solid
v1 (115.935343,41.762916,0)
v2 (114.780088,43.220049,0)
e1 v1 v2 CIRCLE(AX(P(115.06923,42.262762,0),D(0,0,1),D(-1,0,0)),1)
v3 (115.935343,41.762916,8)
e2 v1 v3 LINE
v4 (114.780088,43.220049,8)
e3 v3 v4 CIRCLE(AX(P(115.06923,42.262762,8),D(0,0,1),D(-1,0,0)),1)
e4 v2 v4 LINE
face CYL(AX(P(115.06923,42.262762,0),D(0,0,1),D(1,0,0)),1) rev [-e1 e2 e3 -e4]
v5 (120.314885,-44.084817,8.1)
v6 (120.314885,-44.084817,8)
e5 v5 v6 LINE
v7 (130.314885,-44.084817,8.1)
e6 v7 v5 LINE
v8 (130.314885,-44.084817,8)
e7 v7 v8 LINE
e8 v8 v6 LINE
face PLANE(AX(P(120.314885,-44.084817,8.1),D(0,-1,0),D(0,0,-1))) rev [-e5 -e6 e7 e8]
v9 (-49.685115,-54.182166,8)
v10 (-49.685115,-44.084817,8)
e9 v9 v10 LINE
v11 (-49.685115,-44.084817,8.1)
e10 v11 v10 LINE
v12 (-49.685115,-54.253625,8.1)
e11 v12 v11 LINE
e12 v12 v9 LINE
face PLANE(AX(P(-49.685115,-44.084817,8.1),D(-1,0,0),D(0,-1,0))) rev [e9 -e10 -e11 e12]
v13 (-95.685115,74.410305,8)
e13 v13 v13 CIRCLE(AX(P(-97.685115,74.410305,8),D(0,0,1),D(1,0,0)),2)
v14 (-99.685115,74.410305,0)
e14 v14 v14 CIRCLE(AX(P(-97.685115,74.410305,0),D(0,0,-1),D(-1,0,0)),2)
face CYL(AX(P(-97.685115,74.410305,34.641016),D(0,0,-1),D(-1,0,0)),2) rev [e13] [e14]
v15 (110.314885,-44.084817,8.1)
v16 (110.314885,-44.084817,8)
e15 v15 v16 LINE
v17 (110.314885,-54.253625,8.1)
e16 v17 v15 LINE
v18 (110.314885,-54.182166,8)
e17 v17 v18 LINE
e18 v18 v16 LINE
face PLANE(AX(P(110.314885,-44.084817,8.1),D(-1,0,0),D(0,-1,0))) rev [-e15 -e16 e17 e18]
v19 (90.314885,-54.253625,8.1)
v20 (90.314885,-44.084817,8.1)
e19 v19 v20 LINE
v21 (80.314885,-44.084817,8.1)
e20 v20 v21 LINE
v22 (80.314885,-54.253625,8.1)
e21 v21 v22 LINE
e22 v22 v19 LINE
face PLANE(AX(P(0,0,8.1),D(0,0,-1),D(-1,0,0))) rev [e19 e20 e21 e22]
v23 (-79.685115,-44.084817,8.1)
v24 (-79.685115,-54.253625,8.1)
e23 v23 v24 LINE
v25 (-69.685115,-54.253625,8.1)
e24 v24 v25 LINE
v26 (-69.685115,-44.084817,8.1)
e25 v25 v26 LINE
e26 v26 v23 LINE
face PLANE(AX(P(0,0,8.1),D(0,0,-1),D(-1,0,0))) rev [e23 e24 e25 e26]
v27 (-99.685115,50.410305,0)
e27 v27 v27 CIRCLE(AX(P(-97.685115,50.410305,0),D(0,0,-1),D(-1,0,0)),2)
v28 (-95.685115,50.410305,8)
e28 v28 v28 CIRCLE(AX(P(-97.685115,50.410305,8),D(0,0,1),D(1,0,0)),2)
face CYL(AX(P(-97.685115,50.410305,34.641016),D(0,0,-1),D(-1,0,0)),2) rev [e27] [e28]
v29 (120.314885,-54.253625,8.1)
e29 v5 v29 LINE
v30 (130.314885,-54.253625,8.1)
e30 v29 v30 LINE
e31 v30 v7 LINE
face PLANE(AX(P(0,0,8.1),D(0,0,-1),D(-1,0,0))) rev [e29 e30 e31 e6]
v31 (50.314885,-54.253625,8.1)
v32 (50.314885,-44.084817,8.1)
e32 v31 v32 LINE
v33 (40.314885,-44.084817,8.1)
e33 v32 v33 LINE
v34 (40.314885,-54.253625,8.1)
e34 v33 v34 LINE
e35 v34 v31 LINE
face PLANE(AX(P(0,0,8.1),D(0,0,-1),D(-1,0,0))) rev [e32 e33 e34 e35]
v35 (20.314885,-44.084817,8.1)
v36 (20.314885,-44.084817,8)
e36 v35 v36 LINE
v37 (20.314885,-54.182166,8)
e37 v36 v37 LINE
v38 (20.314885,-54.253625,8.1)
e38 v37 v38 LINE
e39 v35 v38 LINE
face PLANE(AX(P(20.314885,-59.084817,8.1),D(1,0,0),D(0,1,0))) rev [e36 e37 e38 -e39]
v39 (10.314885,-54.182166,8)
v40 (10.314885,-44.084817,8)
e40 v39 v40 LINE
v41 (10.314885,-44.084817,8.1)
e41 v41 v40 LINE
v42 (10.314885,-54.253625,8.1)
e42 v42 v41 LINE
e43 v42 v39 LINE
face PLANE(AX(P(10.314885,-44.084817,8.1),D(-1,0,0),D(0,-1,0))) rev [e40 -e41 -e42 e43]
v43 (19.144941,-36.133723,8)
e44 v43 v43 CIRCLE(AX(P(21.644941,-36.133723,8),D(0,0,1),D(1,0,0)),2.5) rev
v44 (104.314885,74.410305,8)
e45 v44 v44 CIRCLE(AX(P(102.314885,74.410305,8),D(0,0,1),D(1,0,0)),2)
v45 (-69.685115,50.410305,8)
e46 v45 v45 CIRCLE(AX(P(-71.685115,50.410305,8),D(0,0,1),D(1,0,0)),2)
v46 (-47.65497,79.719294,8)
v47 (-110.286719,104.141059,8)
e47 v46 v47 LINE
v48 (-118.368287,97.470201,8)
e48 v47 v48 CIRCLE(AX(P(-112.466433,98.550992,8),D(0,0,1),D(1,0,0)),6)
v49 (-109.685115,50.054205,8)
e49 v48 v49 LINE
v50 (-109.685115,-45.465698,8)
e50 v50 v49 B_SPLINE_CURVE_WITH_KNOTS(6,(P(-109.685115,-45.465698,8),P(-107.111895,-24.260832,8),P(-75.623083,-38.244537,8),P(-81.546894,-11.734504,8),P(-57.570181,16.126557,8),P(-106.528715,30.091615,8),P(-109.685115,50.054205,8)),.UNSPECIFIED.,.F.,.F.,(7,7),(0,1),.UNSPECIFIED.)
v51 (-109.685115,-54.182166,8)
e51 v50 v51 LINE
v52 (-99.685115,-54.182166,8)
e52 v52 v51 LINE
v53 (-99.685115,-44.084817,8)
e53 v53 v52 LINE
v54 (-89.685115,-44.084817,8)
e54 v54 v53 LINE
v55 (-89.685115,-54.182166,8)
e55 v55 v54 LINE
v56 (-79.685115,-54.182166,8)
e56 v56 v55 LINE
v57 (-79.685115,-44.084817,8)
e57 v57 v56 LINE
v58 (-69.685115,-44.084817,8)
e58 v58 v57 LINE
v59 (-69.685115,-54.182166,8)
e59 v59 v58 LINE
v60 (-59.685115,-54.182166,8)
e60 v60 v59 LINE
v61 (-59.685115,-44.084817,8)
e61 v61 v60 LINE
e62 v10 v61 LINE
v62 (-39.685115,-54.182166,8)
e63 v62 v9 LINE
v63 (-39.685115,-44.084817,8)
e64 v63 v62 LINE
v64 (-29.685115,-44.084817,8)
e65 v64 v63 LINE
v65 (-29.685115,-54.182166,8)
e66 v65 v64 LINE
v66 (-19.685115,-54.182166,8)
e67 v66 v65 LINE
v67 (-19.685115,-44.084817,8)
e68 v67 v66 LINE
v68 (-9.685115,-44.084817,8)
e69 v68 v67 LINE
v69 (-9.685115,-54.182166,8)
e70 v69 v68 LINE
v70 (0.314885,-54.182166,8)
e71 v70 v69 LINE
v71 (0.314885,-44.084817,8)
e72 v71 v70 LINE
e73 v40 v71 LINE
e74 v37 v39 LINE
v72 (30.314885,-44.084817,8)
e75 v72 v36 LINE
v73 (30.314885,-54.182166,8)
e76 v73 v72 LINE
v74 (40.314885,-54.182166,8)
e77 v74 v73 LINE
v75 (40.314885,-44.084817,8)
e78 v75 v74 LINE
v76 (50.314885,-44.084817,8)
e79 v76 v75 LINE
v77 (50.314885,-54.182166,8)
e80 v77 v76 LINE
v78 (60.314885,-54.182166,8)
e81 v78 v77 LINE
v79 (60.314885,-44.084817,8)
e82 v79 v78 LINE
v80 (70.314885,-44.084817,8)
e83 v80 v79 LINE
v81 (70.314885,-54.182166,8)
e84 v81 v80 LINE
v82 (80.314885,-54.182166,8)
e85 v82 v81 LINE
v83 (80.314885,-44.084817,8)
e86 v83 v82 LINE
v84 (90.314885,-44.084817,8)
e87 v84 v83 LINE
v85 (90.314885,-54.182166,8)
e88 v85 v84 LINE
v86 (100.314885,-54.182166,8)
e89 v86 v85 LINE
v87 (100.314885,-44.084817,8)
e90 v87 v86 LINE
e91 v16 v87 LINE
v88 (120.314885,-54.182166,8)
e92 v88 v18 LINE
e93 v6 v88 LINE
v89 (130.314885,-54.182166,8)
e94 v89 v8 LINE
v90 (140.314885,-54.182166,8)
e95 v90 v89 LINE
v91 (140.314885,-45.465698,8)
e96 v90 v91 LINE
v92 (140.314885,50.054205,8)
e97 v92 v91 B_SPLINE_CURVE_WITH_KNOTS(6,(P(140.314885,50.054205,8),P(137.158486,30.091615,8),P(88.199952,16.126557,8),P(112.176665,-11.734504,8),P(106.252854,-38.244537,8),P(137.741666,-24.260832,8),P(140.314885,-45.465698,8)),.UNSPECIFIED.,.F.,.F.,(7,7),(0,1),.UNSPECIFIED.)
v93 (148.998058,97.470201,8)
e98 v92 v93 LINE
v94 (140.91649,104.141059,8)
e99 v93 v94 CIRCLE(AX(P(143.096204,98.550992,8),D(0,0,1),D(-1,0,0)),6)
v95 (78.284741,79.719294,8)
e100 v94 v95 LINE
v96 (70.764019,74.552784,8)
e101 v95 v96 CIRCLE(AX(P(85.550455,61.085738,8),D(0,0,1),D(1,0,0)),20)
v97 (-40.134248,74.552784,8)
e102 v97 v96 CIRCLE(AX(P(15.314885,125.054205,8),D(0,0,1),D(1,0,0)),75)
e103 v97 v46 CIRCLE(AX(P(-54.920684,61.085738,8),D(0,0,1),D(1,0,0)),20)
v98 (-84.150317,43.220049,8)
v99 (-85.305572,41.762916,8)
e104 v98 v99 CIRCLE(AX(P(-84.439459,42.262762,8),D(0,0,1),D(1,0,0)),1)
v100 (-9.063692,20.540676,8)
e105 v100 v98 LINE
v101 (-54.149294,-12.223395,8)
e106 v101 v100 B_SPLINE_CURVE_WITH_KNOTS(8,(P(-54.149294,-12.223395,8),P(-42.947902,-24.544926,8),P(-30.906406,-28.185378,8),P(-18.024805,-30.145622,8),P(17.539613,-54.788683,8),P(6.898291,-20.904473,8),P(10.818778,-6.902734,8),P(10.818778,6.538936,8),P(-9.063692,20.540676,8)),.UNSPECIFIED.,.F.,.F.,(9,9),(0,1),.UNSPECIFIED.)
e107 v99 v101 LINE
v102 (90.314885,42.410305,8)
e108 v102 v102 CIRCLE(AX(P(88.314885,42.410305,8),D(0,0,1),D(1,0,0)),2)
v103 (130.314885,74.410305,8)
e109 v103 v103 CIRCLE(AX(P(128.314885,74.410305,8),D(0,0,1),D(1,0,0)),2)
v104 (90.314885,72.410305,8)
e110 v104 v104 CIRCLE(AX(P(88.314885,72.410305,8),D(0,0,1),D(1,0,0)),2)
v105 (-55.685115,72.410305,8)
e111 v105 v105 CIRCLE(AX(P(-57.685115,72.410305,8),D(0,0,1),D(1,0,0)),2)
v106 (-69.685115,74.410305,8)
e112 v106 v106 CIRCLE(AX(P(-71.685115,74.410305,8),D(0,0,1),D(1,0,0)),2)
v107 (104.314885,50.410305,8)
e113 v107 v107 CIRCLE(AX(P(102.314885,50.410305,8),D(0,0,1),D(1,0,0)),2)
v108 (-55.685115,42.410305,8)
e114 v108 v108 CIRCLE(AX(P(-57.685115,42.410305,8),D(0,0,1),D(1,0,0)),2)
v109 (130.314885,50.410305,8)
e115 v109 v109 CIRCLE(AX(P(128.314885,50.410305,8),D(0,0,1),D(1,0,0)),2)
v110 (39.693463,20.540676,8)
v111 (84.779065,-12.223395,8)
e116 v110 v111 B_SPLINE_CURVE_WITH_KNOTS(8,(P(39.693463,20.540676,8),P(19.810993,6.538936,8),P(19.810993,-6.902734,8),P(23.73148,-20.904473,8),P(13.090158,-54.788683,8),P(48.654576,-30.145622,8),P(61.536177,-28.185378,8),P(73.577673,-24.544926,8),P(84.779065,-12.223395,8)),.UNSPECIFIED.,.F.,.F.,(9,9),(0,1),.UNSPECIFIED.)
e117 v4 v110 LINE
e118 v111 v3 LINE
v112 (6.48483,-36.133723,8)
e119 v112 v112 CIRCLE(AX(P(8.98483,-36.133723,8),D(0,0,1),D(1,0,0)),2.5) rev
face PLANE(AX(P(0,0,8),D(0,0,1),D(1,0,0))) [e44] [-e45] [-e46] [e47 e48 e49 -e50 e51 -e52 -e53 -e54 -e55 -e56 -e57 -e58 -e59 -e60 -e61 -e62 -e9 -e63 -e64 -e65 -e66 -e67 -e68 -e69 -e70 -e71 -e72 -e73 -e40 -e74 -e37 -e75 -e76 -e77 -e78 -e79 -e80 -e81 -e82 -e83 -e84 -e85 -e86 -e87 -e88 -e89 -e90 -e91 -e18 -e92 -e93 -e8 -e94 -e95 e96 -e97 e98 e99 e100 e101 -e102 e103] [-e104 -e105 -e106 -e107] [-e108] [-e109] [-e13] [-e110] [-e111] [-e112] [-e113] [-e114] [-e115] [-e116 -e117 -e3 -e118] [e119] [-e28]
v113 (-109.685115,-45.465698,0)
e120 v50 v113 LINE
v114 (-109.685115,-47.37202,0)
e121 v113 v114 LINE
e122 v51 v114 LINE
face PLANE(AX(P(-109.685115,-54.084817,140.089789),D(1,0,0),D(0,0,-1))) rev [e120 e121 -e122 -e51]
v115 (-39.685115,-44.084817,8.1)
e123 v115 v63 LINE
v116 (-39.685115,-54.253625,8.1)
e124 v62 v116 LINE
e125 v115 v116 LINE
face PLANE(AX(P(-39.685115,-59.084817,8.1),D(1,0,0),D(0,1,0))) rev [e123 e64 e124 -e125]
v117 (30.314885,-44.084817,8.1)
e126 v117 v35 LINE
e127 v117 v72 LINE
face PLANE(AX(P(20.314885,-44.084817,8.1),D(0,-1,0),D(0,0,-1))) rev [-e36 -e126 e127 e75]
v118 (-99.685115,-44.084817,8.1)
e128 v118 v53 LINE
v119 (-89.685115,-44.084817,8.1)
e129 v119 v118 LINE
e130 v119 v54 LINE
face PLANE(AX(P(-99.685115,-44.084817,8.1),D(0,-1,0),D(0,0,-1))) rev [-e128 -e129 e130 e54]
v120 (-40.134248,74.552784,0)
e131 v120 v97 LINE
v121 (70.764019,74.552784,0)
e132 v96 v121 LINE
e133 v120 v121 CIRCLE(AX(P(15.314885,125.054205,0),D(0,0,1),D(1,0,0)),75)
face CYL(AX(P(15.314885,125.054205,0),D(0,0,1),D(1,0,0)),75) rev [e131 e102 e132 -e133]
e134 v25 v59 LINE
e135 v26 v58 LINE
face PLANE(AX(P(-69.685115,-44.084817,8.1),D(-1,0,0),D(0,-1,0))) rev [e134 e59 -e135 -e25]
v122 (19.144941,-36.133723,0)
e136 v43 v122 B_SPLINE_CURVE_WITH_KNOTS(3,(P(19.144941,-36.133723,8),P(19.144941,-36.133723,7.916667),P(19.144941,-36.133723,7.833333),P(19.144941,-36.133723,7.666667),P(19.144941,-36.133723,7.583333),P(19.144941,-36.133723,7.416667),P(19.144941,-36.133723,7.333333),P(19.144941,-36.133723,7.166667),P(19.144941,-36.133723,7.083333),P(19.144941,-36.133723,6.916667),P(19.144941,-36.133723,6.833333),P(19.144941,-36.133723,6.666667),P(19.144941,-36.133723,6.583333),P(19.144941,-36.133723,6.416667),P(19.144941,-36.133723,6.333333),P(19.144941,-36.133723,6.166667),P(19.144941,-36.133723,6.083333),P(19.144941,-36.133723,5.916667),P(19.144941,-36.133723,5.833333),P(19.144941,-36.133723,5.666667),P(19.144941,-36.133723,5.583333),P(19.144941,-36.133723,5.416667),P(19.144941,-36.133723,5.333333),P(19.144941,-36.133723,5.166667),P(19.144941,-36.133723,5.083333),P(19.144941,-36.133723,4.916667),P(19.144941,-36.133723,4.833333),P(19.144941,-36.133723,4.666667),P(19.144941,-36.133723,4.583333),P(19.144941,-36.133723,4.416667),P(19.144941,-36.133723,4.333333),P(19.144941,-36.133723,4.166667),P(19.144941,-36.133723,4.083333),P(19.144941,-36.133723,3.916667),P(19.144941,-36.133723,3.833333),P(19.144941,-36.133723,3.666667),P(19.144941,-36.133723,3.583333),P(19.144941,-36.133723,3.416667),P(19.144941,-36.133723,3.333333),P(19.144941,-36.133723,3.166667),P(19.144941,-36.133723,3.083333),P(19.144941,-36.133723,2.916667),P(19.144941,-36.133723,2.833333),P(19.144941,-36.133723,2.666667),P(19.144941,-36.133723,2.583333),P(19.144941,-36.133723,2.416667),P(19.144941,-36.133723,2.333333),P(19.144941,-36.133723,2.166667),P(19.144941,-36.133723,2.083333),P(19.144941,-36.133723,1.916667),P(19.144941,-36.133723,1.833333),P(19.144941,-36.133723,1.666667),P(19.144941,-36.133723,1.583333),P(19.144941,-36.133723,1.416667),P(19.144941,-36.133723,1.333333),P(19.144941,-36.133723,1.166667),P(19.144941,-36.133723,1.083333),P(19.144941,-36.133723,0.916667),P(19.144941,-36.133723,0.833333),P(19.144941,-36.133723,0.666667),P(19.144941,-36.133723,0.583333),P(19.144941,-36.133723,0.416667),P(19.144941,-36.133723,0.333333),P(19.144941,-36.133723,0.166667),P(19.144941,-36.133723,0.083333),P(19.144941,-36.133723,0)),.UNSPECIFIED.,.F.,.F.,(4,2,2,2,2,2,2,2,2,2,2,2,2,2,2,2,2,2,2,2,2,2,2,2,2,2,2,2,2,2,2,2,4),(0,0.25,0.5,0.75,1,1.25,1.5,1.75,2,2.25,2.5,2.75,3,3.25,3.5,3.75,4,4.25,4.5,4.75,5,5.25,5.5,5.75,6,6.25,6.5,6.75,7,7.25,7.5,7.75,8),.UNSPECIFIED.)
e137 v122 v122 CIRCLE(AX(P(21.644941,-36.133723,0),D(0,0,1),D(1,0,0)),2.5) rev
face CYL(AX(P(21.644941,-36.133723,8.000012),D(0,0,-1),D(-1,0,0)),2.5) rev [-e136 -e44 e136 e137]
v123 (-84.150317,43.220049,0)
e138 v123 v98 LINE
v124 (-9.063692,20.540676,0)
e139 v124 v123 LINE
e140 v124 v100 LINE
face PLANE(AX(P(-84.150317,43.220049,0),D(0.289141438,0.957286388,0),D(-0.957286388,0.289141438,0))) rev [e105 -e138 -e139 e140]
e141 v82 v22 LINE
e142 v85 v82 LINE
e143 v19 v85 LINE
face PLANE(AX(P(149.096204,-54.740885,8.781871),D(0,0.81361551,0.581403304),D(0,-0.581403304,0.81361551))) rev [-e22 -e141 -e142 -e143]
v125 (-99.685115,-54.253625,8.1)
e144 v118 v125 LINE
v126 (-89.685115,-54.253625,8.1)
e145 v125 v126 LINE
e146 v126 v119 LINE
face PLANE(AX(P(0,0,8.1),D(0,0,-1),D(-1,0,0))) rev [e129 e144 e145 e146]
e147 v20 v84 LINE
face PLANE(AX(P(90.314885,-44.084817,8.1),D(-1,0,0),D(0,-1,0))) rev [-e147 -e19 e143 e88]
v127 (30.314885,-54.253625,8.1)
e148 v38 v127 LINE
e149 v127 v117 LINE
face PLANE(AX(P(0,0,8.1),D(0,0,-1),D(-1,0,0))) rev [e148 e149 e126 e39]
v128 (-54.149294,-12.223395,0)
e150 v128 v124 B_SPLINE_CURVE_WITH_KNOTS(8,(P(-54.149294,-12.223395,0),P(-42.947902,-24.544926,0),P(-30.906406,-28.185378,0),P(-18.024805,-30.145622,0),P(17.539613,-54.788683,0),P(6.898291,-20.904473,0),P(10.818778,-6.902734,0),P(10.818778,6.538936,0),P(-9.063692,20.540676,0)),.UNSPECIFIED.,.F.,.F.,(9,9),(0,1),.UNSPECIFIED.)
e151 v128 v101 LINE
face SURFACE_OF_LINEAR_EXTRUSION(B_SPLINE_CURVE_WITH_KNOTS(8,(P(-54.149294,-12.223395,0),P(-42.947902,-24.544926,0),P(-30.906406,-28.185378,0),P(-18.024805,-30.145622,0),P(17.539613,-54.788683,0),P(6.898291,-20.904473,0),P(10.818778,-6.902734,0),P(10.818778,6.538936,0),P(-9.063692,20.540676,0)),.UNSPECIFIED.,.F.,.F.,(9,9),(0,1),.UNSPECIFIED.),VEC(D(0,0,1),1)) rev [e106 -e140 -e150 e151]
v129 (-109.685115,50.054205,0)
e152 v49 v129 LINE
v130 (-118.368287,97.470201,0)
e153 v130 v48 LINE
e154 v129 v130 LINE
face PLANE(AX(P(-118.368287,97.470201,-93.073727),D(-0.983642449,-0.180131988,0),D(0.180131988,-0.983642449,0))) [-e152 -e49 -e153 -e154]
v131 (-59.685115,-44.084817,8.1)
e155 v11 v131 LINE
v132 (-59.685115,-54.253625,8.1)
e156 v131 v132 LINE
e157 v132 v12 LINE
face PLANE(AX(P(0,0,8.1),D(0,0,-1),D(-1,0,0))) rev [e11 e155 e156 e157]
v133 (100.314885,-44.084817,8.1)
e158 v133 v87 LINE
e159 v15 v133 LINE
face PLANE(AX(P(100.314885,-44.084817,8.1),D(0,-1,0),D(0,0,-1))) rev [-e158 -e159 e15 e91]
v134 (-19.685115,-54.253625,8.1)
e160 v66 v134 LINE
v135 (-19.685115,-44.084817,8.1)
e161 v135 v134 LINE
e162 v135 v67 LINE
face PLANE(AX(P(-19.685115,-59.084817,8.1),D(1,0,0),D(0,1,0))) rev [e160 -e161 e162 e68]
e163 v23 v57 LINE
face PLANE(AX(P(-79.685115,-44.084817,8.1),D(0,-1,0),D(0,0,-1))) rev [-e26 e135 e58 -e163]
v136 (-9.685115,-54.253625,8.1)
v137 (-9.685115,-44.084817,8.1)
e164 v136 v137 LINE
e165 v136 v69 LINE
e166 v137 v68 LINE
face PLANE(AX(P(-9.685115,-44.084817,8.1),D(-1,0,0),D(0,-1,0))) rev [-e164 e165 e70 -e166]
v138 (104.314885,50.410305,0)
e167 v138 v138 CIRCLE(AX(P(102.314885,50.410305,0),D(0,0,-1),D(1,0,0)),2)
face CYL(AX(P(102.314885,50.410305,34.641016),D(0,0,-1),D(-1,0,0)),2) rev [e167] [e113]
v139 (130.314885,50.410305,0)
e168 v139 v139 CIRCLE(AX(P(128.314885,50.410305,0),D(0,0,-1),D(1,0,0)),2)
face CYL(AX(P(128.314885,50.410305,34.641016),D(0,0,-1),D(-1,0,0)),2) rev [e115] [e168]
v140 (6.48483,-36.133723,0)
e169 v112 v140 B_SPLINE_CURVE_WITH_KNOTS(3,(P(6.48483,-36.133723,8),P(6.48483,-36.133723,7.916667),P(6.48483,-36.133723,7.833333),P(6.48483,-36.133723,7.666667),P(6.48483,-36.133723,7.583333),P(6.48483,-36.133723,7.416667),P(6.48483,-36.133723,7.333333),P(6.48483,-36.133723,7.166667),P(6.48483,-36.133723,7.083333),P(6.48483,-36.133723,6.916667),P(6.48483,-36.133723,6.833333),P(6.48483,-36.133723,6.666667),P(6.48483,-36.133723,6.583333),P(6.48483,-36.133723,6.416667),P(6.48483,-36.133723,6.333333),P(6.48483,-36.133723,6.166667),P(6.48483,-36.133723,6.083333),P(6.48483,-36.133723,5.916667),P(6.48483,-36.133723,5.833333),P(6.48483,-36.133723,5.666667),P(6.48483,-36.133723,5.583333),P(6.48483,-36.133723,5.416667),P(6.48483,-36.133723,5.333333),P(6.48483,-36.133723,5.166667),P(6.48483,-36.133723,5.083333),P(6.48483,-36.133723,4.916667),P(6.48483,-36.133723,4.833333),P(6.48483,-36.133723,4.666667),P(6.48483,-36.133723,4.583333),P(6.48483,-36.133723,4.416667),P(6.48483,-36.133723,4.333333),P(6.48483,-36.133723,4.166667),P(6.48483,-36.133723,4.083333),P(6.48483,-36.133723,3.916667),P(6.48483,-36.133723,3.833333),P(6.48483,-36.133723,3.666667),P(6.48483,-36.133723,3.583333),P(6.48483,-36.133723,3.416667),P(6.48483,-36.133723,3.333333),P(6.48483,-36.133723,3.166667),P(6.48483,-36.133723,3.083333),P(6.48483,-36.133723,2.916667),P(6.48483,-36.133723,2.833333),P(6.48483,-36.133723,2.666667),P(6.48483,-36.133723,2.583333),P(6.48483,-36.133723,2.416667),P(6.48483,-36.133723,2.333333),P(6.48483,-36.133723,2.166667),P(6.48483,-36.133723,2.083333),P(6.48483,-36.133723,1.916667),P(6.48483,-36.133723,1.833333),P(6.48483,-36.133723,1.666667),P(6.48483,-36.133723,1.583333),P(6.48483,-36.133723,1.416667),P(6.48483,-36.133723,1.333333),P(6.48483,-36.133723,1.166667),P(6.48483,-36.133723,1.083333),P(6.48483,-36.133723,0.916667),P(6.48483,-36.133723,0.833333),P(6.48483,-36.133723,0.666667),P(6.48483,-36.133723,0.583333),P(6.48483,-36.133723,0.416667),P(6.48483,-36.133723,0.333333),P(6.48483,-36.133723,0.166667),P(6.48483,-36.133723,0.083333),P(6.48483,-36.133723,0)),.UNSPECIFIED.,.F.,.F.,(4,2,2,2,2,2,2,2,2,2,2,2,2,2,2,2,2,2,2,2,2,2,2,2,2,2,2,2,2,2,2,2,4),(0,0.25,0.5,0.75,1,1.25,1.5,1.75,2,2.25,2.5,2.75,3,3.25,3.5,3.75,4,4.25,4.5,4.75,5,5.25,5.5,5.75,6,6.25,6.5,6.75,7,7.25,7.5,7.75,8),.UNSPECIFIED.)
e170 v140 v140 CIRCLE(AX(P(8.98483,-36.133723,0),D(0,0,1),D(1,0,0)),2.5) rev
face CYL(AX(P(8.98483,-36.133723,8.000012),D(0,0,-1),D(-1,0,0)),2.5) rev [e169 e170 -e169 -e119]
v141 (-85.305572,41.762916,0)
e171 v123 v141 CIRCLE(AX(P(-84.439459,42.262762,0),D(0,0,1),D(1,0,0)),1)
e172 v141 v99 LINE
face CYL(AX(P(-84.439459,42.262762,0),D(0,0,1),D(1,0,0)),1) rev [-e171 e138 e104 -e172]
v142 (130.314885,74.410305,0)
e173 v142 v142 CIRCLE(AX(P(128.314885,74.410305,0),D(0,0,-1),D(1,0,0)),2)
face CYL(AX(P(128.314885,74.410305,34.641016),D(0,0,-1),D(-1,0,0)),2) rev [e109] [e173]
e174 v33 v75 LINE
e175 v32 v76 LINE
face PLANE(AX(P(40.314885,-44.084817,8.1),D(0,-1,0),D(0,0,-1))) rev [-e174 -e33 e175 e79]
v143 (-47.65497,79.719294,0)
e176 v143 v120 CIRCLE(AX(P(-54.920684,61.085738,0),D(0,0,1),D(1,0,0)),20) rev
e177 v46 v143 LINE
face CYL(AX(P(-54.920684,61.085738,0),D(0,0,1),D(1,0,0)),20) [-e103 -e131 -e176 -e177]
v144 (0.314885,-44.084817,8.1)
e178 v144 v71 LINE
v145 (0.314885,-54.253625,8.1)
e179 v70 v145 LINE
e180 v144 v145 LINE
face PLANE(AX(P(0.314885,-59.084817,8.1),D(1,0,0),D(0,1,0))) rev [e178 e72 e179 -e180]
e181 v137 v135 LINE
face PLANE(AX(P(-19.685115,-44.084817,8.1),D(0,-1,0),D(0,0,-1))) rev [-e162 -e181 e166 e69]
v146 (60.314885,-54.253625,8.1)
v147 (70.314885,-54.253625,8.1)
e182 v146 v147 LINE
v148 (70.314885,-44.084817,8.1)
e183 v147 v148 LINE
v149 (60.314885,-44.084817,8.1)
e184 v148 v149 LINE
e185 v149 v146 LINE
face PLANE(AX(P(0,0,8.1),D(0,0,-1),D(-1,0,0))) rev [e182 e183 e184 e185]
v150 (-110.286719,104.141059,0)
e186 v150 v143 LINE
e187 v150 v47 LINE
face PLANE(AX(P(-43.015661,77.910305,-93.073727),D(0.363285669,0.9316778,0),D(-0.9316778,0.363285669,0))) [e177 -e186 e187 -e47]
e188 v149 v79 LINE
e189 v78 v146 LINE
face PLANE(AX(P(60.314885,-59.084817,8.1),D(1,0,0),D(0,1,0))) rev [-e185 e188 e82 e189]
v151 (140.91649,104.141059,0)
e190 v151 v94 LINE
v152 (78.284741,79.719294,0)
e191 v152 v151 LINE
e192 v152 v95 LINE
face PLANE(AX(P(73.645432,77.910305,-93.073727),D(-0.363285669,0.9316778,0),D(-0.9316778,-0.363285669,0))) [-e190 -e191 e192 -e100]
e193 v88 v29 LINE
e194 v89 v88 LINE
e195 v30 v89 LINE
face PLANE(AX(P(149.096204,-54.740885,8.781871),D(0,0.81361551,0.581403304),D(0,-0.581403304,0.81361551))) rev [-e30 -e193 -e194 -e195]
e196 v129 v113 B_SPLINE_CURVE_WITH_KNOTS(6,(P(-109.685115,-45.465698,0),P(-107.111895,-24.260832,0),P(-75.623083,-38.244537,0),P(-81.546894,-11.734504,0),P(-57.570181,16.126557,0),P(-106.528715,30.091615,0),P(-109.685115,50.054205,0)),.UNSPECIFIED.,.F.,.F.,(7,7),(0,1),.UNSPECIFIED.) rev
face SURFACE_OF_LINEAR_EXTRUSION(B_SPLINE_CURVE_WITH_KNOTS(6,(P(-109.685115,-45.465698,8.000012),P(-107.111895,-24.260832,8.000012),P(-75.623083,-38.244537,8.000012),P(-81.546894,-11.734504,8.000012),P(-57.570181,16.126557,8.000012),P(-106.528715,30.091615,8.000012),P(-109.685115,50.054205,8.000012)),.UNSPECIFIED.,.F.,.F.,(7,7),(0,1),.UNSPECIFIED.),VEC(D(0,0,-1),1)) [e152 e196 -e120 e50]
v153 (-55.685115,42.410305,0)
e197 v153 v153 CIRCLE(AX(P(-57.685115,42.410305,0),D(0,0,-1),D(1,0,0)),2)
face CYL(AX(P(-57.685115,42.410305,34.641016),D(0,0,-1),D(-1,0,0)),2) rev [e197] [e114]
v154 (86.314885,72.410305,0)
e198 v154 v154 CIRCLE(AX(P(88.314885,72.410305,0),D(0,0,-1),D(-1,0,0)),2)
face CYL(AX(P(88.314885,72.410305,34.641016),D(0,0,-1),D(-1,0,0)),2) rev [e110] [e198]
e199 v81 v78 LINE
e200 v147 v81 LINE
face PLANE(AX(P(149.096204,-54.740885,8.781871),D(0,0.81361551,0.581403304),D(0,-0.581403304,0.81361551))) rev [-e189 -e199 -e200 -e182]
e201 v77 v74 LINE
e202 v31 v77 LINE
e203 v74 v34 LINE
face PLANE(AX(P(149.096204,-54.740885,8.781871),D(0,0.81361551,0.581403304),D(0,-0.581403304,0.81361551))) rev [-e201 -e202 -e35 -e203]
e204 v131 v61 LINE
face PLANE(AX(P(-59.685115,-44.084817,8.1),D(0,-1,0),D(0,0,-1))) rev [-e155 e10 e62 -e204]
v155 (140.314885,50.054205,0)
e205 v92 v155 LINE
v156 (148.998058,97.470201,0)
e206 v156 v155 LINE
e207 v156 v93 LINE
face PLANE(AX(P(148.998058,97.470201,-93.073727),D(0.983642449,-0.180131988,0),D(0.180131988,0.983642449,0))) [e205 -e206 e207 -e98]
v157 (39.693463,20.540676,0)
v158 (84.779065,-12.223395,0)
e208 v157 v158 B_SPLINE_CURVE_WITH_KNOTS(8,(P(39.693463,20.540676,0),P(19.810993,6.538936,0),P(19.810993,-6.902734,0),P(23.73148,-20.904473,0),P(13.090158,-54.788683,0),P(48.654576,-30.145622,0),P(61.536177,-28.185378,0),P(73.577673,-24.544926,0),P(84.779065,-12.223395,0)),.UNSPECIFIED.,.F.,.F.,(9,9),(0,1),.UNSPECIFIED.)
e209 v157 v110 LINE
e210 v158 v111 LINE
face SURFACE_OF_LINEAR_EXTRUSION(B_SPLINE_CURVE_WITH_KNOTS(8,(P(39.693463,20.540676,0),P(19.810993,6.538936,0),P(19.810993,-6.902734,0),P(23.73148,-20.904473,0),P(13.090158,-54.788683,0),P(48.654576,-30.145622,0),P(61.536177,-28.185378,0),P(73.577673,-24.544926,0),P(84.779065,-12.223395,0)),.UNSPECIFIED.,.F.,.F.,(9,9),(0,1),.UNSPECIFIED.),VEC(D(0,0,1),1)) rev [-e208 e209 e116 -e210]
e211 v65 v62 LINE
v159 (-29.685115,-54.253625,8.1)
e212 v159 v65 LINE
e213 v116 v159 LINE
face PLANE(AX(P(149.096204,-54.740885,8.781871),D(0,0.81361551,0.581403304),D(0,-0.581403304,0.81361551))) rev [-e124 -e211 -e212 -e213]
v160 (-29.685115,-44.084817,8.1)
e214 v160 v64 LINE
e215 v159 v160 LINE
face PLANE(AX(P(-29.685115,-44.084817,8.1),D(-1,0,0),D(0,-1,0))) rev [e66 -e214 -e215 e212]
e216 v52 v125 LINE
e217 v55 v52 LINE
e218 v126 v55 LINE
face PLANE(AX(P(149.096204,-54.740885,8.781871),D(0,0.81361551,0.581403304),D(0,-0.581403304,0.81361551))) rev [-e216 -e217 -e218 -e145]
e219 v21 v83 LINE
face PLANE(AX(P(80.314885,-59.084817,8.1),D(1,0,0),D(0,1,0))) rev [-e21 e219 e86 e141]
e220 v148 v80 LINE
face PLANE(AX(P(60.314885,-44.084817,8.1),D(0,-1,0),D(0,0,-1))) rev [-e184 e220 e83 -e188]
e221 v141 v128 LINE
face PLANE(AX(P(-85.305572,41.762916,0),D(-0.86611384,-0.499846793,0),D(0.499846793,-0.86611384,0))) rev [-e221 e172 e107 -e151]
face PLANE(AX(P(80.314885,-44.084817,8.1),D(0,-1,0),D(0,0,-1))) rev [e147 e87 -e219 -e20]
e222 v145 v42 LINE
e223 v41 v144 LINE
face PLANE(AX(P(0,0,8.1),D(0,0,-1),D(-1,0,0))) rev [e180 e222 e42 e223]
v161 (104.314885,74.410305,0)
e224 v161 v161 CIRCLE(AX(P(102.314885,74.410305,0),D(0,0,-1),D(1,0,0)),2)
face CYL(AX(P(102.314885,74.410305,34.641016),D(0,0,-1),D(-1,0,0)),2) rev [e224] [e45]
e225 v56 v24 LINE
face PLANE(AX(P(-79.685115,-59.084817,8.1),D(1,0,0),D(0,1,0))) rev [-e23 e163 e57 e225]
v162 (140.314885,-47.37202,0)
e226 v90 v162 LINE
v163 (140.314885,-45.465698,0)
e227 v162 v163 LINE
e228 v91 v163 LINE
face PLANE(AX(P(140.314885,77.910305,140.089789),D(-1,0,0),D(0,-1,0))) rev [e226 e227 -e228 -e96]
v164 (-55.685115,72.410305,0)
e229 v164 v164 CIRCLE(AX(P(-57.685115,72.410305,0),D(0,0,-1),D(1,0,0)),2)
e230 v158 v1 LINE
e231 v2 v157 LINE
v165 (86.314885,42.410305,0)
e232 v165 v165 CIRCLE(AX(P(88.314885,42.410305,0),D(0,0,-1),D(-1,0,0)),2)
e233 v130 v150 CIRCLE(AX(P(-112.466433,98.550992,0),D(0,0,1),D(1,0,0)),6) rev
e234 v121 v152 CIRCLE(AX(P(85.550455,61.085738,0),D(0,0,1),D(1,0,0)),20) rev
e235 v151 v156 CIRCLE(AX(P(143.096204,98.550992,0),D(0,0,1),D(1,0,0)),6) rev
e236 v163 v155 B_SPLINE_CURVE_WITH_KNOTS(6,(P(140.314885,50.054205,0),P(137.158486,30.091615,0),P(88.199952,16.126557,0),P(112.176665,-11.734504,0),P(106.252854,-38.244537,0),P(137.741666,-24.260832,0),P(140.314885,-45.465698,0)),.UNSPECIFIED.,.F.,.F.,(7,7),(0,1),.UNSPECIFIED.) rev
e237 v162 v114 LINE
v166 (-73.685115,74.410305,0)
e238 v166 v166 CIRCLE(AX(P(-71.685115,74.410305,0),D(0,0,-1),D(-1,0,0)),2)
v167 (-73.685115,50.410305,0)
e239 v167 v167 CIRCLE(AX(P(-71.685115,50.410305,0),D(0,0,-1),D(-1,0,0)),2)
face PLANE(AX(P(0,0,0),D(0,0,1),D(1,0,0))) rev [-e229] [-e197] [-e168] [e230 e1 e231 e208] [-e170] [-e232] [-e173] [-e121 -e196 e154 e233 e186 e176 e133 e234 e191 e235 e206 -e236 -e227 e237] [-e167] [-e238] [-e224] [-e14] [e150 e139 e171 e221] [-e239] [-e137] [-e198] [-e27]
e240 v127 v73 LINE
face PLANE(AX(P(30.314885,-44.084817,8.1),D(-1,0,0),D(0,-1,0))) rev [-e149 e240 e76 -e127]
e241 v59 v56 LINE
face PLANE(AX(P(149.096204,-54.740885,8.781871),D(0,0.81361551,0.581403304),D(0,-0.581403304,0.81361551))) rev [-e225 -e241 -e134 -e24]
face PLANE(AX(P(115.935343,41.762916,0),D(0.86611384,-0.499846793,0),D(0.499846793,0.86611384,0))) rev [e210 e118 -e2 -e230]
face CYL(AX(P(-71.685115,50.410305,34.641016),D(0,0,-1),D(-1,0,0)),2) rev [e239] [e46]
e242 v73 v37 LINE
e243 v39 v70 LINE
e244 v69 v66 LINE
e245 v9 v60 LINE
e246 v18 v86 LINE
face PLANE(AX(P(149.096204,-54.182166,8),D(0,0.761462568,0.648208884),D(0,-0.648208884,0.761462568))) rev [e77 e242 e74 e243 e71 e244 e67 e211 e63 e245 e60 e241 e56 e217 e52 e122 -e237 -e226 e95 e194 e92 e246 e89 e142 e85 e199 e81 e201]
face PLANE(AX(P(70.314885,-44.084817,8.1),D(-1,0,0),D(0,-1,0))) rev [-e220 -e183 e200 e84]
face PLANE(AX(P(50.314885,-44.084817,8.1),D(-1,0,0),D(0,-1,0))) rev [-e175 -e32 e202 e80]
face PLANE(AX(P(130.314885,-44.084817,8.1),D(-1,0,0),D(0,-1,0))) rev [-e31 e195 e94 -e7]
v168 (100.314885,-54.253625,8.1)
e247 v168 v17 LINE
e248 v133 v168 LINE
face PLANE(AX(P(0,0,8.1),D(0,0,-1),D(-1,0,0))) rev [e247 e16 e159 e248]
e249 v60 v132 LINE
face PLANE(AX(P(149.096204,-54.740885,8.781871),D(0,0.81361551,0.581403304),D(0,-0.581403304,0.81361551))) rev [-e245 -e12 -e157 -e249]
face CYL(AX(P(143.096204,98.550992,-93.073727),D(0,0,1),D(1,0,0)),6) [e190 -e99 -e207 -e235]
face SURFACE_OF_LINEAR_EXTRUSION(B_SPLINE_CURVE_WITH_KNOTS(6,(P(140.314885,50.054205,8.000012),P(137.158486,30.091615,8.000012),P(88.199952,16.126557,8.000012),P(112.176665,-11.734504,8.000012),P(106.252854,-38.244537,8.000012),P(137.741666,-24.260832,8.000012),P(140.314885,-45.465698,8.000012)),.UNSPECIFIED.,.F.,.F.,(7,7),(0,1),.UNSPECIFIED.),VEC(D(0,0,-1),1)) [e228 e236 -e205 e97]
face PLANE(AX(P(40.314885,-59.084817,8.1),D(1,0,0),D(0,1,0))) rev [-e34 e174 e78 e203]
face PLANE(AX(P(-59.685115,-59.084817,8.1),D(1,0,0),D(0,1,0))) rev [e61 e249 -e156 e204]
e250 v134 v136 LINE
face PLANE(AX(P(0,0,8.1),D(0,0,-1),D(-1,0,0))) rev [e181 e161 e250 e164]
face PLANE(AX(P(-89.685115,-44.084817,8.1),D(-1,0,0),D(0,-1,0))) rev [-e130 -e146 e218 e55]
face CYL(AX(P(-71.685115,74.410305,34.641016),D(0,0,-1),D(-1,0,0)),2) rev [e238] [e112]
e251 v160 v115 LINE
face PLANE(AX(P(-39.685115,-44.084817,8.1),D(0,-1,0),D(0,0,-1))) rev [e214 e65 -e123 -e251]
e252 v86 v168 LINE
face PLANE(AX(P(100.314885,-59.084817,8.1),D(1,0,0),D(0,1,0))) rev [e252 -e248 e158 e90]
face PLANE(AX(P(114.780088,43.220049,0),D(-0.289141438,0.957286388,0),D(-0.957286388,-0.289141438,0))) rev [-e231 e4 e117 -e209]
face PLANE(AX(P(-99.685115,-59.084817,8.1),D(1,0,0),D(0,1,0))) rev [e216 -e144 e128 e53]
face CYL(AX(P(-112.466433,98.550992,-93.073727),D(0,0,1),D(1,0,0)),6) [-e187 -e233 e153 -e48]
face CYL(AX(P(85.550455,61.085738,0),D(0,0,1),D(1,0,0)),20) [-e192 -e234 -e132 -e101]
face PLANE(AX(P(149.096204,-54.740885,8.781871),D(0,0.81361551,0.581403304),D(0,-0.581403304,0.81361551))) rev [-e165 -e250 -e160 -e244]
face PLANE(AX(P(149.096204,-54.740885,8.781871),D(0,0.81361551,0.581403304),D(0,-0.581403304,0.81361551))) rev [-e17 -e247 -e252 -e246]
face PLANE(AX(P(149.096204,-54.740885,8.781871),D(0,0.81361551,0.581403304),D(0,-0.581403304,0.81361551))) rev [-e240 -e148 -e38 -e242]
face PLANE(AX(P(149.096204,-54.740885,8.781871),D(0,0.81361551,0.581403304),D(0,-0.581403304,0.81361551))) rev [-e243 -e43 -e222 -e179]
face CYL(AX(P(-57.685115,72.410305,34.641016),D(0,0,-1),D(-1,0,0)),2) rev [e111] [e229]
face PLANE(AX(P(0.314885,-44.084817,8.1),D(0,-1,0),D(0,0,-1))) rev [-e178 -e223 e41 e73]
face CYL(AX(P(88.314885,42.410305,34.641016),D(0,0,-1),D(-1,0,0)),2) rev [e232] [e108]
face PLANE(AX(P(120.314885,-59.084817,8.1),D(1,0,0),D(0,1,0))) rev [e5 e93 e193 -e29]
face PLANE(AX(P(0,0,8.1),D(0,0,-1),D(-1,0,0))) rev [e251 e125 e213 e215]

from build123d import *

# Parameters (mm, degrees)
SKETCH_1_W               = 240
SKETCH_1_H               = 120
EXTRUDE_1_DEPTH          = 8
CUT_EXTRUDE_3_DEPTH      = 240
EXTRUDE_3_DEPTH          = 240
EXTRUDE_4_DEPTH          = 2
EXTRUDE_5_DEPTH          = 2
SKETCH_10_R              = 2
CUT_EXTRUDE_4_DEPTH      = 160.937906437
CUT_EXTRUDE_START        = -8
CUT_EXTRUDE_5_DEPTH      = 8
CUT_EXTRUDE_6_DEPTH      = 253.812214384
CUT_EXTRUDE_6_DEPTH_BACK = 253.812214384
CUT_EXTRUDE_7_DEPTH      = 255.695928005
EXTRUDE_6_DEPTH          = 240
CUT_EXTRUDE_8_REACH      = 254.456
SKETCH_19_W              = 5
SKETCH_19_H              = 131.995122826
EXTRUDE_7_DEPTH          = 8
CUT_EXTRUDE_9_DEPTH      = 25000
CUT_EXTRUDE_10_OUTLINE_R = 2.5
CUT_EXTRUDE_10_DEPTH     = 8
EXTRUDE_9_DEPTH          = 8
FILLET_1_R               = 20
EXTRUDE_11_DEPTH         = 250
SKETCH_26_W              = 10
SKETCH_26_H              = 15
EXTRUDE_12_DEPTH         = 0.1
CUT_EXTRUDE_11_DEPTH     = 280.220863782


# Read off the part's stored shape, not the designer's step: 切除-拉伸5, 切除-拉伸10
with BuildPart() as part:
    # 草图1 → 凸台-拉伸1 (new body)
    with BuildSketch(Plane.XY):
        with Locations((15.314885496, 17.910305344)):
            Rectangle(SKETCH_1_W, SKETCH_1_H)
    extrude(amount=EXTRUDE_1_DEPTH)

    # 草图5 → 切除-拉伸3 (cut)
    with BuildSketch(Plane.ZY.offset(104.685114504)):
        Polygon((0, -42.089694656), (8, -42.089694656), (1.137058799, -38.127373707), (0, -37.470892503), align=None)
    extrude(amount=-CUT_EXTRUDE_3_DEPTH, mode=Mode.SUBTRACT)

    # 草图6 → 凸台-拉伸3 (add)
    with BuildSketch(Plane.ZY.offset(104.685114504)):
        Polygon((8, -42.089694656), (34.641016151, -59.78029358), (8, -36.526716392), align=None)
    extrude(amount=-EXTRUDE_3_DEPTH)

    # 草图7 → 凸台-拉伸4 (add)
    with BuildSketch(Plane.ZY.offset(104.685114504)):
        Polygon((8, 10.562283697), (24.445035201, -50.880744528), (8, -36.526716392), align=None)
    extrude(amount=-EXTRUDE_4_DEPTH)

    # 草图8 → 凸台-拉伸5 (add)
    with BuildSketch(Plane(origin=(135.314885496, 0, 0), x_dir=(0, 0, -1), z_dir=(1, 0, 0))):
        Polygon((-8, 10.562283697), (-8, -36.526716392), (-24.445035201, -50.880744528), align=None)
    extrude(amount=-EXTRUDE_5_DEPTH)

    # 草图10 → 切除-拉伸4 (cut, through all)
    with BuildSketch(Plane(origin=(0, 0, 0), x_dir=(-1, 0, 0), z_dir=(0, 0, -1))):
        with Locations((-88.314885496, 72.410305344)):
            Circle(SKETCH_10_R)
        with Locations((-88.314885496, 42.410305344)):
            Circle(SKETCH_10_R)
        with Locations(Location((57.685114504, 42.410305344, 0), (0, 0, 180))):
            Circle(SKETCH_10_R)
        with Locations(Location((57.685114504, 72.410305344, 0), (0, 0, 180))):
            Circle(SKETCH_10_R)
        with Locations((97.685114504, 74.410305344)):
            Circle(SKETCH_10_R)
        with Locations((97.685114504, 50.410305344)):
            Circle(SKETCH_10_R)
        with Locations((71.685114504, 74.410305344)):
            Circle(SKETCH_10_R)
        with Locations((71.685114504, 50.410305344)):
            Circle(SKETCH_10_R)
        with Locations(Location((-102.314885496, 50.410305344, 0), (0, 0, 180))):
            Circle(SKETCH_10_R)
        with Locations(Location((-128.314885496, 50.410305344, 0), (0, 0, 180))):
            Circle(SKETCH_10_R)
        with Locations(Location((-128.314885496, 74.410305344, 0), (0, 0, 180))):
            Circle(SKETCH_10_R)
        with Locations(Location((-102.314885496, 74.410305344, 0), (0, 0, 180))):
            Circle(SKETCH_10_R)
    extrude(amount=-CUT_EXTRUDE_4_DEPTH, mode=Mode.SUBTRACT)

    # 切除-拉伸5 outline → 切除-拉伸5 (cut)
    with BuildSketch(Plane.XY.offset(8).offset(CUT_EXTRUDE_START)):
        with BuildLine():
            Line((-85.305572399, 41.762915626), (-54.149293781, -12.223394737))
            add(Edge.make_bspline(
                [(-54.149293781, -12.223394737), (-42.947902037, -24.544925656), (-30.906405911, -28.185377973), (-18.024805405, -30.145621528), (17.539613385, -54.788683367), (6.898291227, -20.904473339), (10.818778338, -6.902733658), (10.818778338, 6.538936436), (-9.063692009, 20.540676117)],
                knots=[0, 0, 0, 0, 0, 0, 0, 0, 0, 1, 1, 1, 1, 1, 1, 1, 1, 1], degree=8))
            Line((-9.063692009, 20.540676117), (-84.150317121, 43.220048807))
            ThreePointArc((-84.150317121, 43.220048807), (-85.223061497, 42.884024389), (-85.305572399, 41.762915626))
        make_face()
        with BuildLine():
            Line((114.780088113, 43.220048807), (39.693463001, 20.540676117))
            add(Edge.make_bspline(
                [(39.693463001, 20.540676117), (19.810992654, 6.538936436), (19.810992654, -6.902733658), (23.731479765, -20.904473339), (13.090157607, -54.788683367), (48.654576397, -30.145621528), (61.536176903, -28.185377973), (73.577673029, -24.544925656), (84.779064774, -12.223394737)],
                knots=[0, 0, 0, 0, 0, 0, 0, 0, 0, 1, 1, 1, 1, 1, 1, 1, 1, 1], degree=8))
            Line((84.779064774, -12.223394737), (115.935343391, 41.762915626))
            ThreePointArc((115.935343391, 41.762915626), (115.85283249, 42.884024389), (114.780088113, 43.220048807))
        make_face()
        with BuildLine():
            Line((73.645432244, 77.910305344), (-43.015661252, 77.910305344))
            ThreePointArc((-43.015661252, 77.910305344), (15.314885496, 50.054205438), (73.645432244, 77.910305344))
        make_face()
    extrude(amount=CUT_EXTRUDE_5_DEPTH, mode=Mode.SUBTRACT)

    # 草图14 → 切除-拉伸6 (cut, two sides: drawn at the far end of the back side and taken through both)
    with BuildSketch(Plane(origin=(-102.685114504, 0, 0), x_dir=(0, 0, -1), z_dir=(1, 0, 0)).offset(-CUT_EXTRUDE_6_DEPTH_BACK)):
        Polygon((-8, -36.526716392), (-8, 10.562283697), (-24.445035201, -50.880744528), align=None)
    extrude(amount=CUT_EXTRUDE_6_DEPTH + CUT_EXTRUDE_6_DEPTH_BACK, mode=Mode.SUBTRACT)

    # 草图15 → 切除-拉伸7 (cut, through all)
    with BuildSketch(Plane(origin=(135.314885496, 0, 0), x_dir=(0, 0, -1), z_dir=(1, 0, 0))):
        Polygon((-8, -36.526716392), (-8, -49.78029358), (-41.869464541, -71.644239127), (-41.869464541, -31.236191865), align=None)
    extrude(amount=-CUT_EXTRUDE_7_DEPTH, mode=Mode.SUBTRACT)

    # 草图17 → 凸台-拉伸6 (add)
    with BuildSketch(Plane.ZY.offset(104.685114504)):
        Polygon((8, -42.089694656), (0, -37.470892503), (0, -57.621161091), (8, -62.239963244), align=None)
    extrude(amount=-EXTRUDE_6_DEPTH)

    # 草图18 → 切除-拉伸8 (cut, up to next)
    with BuildSketch(Plane.ZY.offset(104.685114504), mode=Mode.PRIVATE) as cut_extrude_8_sk1:
        Polygon((8, -54.084817482), (0, -47.372020433), (0, -57.621161091), (8, -62.239963244), align=None)
    cut_extrude_8_tool1 = extrude(cut_extrude_8_sk1.sketch, amount=-CUT_EXTRUDE_8_REACH, mode=Mode.PRIVATE) & part.part
    add(cut_extrude_8_tool1.solids().sort_by_distance((-104.685115, -55.22205, 3.848297))[0], mode=Mode.SUBTRACT)

    # 草图19 → 凸台-拉伸7 (add)
    with BuildSketch(Plane.XY):
        with Locations((-107.185114504, 11.912743931)):
            Rectangle(SKETCH_19_W, SKETCH_19_H)
        with Locations((137.814885496, 11.912743931)):
            Rectangle(SKETCH_19_W, SKETCH_19_H)
    extrude(amount=EXTRUDE_7_DEPTH)

    # 草图20 → 切除-拉伸9 (cut, symmetric)
    with BuildSketch(Plane(origin=(-104.685114504, 0, 0), x_dir=(0, 0, -1), z_dir=(1, 0, 0))):
        Polygon((0, -47.372020433), (-8, -54.084817482), (0, -54.084817482), align=None)
    extrude(amount=CUT_EXTRUDE_9_DEPTH, both=True, mode=Mode.SUBTRACT)

    # 切除-拉伸10 outline → 切除-拉伸10 (cut)
    with BuildSketch(Plane.XY.offset(8).offset(CUT_EXTRUDE_START)):
        with BuildLine():
            Line((140.314885496, -45.465697905), (140.314885496, 50.054205438))
            add(Edge.make_bspline(
                [(140.314885496, 50.054205438), (137.158486233, 30.091614758), (88.199951512, 16.126556544), (112.176664555, -11.734503746), (106.252853678, -38.244537039), (137.741665906, -24.260832479), (140.314885496, -45.465697905)],
                knots=[0, 0, 0, 0, 0, 0, 0, 1, 1, 1, 1, 1, 1, 1], degree=6))
        make_face()
        with BuildLine():
            Line((-109.685114504, 50.054205438), (-109.685114504, -45.465697905))
            add(Edge.make_bspline(
                [(-109.685114504, -45.465697905), (-107.111894913, -24.260832479), (-75.623082686, -38.244537039), (-81.546893563, -11.734503746), (-57.57018052, 16.126556544), (-106.528715241, 30.091614758), (-109.685114504, 50.054205438)],
                knots=[0, 0, 0, 0, 0, 0, 0, 1, 1, 1, 1, 1, 1, 1], degree=6))
        make_face()
        with Locations((8.984830356, -36.133723352)):
            Circle(CUT_EXTRUDE_10_OUTLINE_R)
        with Locations((21.644940637, -36.133723352)):
            Circle(CUT_EXTRUDE_10_OUTLINE_R)
    extrude(amount=CUT_EXTRUDE_10_DEPTH, mode=Mode.SUBTRACT)

    # 草图23 → 凸台-拉伸9 (add)
    with BuildSketch(Plane.XY.offset(8)):
        with BuildLine():
            Line((-109.685114504, 77.910305344), (-43.015661252, 77.910305344))
            Line((-43.015661252, 77.910305344), (-110.286718721, 104.141059297))
            ThreePointArc((-110.286718721, 104.141059297), (-116.285944727, 103.178230136), (-118.368287428, 97.470200569))
            Line((-118.368287428, 97.470200569), (-109.685114504, 50.054205438))
            Line((-109.685114504, 50.054205438), (-109.685114504, 77.910305344))
        make_face()
        with BuildLine():
            Line((148.998058421, 97.470200569), (140.314885496, 50.054205438))
            Line((140.314885496, 50.054205438), (140.314885496, 77.910305344))
            Line((140.314885496, 77.910305344), (73.645432244, 77.910305344))
            Line((73.645432244, 77.910305344), (140.916489713, 104.141059297))
            ThreePointArc((140.916489713, 104.141059297), (146.915715719, 103.178230136), (148.998058421, 97.470200569))
        make_face()
    extrude(amount=-EXTRUDE_9_DEPTH)

    # 圆角1
    fillet_1_edges = [part.edges().sort_by_distance(p)[0] for p in [
        (73.645432244, 77.910305344, 4),
        (-43.015661252, 77.910305344, 4),
    ]]
    fillet(fillet_1_edges, radius=FILLET_1_R)

    # 草图25 → 凸台-拉伸11 (add)
    with BuildSketch(Plane.ZY.offset(109.685114504)):
        Polygon((0, -47.372020433), (8, -54.084817482), (8, -59.084817482), (0, -52.372020433), align=None)
    extrude(amount=-EXTRUDE_11_DEPTH)

    # 草图26 → 凸台-拉伸12 (add)
    with BuildSketch(Plane.XY.offset(8)):
        with Locations((-94.685114504, -51.584817482)):
            Rectangle(SKETCH_26_W, SKETCH_26_H)
        with Locations((-74.685114504, -51.584817482)):
            Rectangle(SKETCH_26_W, SKETCH_26_H)
        with Locations((-54.685114504, -51.584817482)):
            Rectangle(SKETCH_26_W, SKETCH_26_H)
        with Locations((-34.685114504, -51.584817482)):
            Rectangle(SKETCH_26_W, SKETCH_26_H)
        with Locations((-14.685114504, -51.584817482)):
            Rectangle(SKETCH_26_W, SKETCH_26_H)
        with Locations((5.314885496, -51.584817482)):
            Rectangle(SKETCH_26_W, SKETCH_26_H)
        with Locations((25.314885496, -51.584817482)):
            Rectangle(SKETCH_26_W, SKETCH_26_H)
        with Locations((45.314885496, -51.584817482)):
            Rectangle(SKETCH_26_W, SKETCH_26_H)
        with Locations((65.314885496, -51.584817482)):
            Rectangle(SKETCH_26_W, SKETCH_26_H)
        with Locations((85.314885496, -51.584817482)):
            Rectangle(SKETCH_26_W, SKETCH_26_H)
        with Locations((105.314885496, -51.584817482)):
            Rectangle(SKETCH_26_W, SKETCH_26_H)
        with Locations((125.314885496, -51.584817482)):
            Rectangle(SKETCH_26_W, SKETCH_26_H)
    extrude(amount=EXTRUDE_12_DEPTH)

    # 草图27 → 切除-拉伸11 (cut, through all)
    with BuildSketch(Plane.ZY.offset(109.685114504)):
        Polygon((8, -54.182166182), (0, -47.372020433), (0, -52.372020433), (8, -59.084817482), (8.781870659, -59.891234403), (8.781870659, -54.740884863), align=None)
    extrude(amount=-CUT_EXTRUDE_11_DEPTH, mode=Mode.SUBTRACT)


solid = part.part
